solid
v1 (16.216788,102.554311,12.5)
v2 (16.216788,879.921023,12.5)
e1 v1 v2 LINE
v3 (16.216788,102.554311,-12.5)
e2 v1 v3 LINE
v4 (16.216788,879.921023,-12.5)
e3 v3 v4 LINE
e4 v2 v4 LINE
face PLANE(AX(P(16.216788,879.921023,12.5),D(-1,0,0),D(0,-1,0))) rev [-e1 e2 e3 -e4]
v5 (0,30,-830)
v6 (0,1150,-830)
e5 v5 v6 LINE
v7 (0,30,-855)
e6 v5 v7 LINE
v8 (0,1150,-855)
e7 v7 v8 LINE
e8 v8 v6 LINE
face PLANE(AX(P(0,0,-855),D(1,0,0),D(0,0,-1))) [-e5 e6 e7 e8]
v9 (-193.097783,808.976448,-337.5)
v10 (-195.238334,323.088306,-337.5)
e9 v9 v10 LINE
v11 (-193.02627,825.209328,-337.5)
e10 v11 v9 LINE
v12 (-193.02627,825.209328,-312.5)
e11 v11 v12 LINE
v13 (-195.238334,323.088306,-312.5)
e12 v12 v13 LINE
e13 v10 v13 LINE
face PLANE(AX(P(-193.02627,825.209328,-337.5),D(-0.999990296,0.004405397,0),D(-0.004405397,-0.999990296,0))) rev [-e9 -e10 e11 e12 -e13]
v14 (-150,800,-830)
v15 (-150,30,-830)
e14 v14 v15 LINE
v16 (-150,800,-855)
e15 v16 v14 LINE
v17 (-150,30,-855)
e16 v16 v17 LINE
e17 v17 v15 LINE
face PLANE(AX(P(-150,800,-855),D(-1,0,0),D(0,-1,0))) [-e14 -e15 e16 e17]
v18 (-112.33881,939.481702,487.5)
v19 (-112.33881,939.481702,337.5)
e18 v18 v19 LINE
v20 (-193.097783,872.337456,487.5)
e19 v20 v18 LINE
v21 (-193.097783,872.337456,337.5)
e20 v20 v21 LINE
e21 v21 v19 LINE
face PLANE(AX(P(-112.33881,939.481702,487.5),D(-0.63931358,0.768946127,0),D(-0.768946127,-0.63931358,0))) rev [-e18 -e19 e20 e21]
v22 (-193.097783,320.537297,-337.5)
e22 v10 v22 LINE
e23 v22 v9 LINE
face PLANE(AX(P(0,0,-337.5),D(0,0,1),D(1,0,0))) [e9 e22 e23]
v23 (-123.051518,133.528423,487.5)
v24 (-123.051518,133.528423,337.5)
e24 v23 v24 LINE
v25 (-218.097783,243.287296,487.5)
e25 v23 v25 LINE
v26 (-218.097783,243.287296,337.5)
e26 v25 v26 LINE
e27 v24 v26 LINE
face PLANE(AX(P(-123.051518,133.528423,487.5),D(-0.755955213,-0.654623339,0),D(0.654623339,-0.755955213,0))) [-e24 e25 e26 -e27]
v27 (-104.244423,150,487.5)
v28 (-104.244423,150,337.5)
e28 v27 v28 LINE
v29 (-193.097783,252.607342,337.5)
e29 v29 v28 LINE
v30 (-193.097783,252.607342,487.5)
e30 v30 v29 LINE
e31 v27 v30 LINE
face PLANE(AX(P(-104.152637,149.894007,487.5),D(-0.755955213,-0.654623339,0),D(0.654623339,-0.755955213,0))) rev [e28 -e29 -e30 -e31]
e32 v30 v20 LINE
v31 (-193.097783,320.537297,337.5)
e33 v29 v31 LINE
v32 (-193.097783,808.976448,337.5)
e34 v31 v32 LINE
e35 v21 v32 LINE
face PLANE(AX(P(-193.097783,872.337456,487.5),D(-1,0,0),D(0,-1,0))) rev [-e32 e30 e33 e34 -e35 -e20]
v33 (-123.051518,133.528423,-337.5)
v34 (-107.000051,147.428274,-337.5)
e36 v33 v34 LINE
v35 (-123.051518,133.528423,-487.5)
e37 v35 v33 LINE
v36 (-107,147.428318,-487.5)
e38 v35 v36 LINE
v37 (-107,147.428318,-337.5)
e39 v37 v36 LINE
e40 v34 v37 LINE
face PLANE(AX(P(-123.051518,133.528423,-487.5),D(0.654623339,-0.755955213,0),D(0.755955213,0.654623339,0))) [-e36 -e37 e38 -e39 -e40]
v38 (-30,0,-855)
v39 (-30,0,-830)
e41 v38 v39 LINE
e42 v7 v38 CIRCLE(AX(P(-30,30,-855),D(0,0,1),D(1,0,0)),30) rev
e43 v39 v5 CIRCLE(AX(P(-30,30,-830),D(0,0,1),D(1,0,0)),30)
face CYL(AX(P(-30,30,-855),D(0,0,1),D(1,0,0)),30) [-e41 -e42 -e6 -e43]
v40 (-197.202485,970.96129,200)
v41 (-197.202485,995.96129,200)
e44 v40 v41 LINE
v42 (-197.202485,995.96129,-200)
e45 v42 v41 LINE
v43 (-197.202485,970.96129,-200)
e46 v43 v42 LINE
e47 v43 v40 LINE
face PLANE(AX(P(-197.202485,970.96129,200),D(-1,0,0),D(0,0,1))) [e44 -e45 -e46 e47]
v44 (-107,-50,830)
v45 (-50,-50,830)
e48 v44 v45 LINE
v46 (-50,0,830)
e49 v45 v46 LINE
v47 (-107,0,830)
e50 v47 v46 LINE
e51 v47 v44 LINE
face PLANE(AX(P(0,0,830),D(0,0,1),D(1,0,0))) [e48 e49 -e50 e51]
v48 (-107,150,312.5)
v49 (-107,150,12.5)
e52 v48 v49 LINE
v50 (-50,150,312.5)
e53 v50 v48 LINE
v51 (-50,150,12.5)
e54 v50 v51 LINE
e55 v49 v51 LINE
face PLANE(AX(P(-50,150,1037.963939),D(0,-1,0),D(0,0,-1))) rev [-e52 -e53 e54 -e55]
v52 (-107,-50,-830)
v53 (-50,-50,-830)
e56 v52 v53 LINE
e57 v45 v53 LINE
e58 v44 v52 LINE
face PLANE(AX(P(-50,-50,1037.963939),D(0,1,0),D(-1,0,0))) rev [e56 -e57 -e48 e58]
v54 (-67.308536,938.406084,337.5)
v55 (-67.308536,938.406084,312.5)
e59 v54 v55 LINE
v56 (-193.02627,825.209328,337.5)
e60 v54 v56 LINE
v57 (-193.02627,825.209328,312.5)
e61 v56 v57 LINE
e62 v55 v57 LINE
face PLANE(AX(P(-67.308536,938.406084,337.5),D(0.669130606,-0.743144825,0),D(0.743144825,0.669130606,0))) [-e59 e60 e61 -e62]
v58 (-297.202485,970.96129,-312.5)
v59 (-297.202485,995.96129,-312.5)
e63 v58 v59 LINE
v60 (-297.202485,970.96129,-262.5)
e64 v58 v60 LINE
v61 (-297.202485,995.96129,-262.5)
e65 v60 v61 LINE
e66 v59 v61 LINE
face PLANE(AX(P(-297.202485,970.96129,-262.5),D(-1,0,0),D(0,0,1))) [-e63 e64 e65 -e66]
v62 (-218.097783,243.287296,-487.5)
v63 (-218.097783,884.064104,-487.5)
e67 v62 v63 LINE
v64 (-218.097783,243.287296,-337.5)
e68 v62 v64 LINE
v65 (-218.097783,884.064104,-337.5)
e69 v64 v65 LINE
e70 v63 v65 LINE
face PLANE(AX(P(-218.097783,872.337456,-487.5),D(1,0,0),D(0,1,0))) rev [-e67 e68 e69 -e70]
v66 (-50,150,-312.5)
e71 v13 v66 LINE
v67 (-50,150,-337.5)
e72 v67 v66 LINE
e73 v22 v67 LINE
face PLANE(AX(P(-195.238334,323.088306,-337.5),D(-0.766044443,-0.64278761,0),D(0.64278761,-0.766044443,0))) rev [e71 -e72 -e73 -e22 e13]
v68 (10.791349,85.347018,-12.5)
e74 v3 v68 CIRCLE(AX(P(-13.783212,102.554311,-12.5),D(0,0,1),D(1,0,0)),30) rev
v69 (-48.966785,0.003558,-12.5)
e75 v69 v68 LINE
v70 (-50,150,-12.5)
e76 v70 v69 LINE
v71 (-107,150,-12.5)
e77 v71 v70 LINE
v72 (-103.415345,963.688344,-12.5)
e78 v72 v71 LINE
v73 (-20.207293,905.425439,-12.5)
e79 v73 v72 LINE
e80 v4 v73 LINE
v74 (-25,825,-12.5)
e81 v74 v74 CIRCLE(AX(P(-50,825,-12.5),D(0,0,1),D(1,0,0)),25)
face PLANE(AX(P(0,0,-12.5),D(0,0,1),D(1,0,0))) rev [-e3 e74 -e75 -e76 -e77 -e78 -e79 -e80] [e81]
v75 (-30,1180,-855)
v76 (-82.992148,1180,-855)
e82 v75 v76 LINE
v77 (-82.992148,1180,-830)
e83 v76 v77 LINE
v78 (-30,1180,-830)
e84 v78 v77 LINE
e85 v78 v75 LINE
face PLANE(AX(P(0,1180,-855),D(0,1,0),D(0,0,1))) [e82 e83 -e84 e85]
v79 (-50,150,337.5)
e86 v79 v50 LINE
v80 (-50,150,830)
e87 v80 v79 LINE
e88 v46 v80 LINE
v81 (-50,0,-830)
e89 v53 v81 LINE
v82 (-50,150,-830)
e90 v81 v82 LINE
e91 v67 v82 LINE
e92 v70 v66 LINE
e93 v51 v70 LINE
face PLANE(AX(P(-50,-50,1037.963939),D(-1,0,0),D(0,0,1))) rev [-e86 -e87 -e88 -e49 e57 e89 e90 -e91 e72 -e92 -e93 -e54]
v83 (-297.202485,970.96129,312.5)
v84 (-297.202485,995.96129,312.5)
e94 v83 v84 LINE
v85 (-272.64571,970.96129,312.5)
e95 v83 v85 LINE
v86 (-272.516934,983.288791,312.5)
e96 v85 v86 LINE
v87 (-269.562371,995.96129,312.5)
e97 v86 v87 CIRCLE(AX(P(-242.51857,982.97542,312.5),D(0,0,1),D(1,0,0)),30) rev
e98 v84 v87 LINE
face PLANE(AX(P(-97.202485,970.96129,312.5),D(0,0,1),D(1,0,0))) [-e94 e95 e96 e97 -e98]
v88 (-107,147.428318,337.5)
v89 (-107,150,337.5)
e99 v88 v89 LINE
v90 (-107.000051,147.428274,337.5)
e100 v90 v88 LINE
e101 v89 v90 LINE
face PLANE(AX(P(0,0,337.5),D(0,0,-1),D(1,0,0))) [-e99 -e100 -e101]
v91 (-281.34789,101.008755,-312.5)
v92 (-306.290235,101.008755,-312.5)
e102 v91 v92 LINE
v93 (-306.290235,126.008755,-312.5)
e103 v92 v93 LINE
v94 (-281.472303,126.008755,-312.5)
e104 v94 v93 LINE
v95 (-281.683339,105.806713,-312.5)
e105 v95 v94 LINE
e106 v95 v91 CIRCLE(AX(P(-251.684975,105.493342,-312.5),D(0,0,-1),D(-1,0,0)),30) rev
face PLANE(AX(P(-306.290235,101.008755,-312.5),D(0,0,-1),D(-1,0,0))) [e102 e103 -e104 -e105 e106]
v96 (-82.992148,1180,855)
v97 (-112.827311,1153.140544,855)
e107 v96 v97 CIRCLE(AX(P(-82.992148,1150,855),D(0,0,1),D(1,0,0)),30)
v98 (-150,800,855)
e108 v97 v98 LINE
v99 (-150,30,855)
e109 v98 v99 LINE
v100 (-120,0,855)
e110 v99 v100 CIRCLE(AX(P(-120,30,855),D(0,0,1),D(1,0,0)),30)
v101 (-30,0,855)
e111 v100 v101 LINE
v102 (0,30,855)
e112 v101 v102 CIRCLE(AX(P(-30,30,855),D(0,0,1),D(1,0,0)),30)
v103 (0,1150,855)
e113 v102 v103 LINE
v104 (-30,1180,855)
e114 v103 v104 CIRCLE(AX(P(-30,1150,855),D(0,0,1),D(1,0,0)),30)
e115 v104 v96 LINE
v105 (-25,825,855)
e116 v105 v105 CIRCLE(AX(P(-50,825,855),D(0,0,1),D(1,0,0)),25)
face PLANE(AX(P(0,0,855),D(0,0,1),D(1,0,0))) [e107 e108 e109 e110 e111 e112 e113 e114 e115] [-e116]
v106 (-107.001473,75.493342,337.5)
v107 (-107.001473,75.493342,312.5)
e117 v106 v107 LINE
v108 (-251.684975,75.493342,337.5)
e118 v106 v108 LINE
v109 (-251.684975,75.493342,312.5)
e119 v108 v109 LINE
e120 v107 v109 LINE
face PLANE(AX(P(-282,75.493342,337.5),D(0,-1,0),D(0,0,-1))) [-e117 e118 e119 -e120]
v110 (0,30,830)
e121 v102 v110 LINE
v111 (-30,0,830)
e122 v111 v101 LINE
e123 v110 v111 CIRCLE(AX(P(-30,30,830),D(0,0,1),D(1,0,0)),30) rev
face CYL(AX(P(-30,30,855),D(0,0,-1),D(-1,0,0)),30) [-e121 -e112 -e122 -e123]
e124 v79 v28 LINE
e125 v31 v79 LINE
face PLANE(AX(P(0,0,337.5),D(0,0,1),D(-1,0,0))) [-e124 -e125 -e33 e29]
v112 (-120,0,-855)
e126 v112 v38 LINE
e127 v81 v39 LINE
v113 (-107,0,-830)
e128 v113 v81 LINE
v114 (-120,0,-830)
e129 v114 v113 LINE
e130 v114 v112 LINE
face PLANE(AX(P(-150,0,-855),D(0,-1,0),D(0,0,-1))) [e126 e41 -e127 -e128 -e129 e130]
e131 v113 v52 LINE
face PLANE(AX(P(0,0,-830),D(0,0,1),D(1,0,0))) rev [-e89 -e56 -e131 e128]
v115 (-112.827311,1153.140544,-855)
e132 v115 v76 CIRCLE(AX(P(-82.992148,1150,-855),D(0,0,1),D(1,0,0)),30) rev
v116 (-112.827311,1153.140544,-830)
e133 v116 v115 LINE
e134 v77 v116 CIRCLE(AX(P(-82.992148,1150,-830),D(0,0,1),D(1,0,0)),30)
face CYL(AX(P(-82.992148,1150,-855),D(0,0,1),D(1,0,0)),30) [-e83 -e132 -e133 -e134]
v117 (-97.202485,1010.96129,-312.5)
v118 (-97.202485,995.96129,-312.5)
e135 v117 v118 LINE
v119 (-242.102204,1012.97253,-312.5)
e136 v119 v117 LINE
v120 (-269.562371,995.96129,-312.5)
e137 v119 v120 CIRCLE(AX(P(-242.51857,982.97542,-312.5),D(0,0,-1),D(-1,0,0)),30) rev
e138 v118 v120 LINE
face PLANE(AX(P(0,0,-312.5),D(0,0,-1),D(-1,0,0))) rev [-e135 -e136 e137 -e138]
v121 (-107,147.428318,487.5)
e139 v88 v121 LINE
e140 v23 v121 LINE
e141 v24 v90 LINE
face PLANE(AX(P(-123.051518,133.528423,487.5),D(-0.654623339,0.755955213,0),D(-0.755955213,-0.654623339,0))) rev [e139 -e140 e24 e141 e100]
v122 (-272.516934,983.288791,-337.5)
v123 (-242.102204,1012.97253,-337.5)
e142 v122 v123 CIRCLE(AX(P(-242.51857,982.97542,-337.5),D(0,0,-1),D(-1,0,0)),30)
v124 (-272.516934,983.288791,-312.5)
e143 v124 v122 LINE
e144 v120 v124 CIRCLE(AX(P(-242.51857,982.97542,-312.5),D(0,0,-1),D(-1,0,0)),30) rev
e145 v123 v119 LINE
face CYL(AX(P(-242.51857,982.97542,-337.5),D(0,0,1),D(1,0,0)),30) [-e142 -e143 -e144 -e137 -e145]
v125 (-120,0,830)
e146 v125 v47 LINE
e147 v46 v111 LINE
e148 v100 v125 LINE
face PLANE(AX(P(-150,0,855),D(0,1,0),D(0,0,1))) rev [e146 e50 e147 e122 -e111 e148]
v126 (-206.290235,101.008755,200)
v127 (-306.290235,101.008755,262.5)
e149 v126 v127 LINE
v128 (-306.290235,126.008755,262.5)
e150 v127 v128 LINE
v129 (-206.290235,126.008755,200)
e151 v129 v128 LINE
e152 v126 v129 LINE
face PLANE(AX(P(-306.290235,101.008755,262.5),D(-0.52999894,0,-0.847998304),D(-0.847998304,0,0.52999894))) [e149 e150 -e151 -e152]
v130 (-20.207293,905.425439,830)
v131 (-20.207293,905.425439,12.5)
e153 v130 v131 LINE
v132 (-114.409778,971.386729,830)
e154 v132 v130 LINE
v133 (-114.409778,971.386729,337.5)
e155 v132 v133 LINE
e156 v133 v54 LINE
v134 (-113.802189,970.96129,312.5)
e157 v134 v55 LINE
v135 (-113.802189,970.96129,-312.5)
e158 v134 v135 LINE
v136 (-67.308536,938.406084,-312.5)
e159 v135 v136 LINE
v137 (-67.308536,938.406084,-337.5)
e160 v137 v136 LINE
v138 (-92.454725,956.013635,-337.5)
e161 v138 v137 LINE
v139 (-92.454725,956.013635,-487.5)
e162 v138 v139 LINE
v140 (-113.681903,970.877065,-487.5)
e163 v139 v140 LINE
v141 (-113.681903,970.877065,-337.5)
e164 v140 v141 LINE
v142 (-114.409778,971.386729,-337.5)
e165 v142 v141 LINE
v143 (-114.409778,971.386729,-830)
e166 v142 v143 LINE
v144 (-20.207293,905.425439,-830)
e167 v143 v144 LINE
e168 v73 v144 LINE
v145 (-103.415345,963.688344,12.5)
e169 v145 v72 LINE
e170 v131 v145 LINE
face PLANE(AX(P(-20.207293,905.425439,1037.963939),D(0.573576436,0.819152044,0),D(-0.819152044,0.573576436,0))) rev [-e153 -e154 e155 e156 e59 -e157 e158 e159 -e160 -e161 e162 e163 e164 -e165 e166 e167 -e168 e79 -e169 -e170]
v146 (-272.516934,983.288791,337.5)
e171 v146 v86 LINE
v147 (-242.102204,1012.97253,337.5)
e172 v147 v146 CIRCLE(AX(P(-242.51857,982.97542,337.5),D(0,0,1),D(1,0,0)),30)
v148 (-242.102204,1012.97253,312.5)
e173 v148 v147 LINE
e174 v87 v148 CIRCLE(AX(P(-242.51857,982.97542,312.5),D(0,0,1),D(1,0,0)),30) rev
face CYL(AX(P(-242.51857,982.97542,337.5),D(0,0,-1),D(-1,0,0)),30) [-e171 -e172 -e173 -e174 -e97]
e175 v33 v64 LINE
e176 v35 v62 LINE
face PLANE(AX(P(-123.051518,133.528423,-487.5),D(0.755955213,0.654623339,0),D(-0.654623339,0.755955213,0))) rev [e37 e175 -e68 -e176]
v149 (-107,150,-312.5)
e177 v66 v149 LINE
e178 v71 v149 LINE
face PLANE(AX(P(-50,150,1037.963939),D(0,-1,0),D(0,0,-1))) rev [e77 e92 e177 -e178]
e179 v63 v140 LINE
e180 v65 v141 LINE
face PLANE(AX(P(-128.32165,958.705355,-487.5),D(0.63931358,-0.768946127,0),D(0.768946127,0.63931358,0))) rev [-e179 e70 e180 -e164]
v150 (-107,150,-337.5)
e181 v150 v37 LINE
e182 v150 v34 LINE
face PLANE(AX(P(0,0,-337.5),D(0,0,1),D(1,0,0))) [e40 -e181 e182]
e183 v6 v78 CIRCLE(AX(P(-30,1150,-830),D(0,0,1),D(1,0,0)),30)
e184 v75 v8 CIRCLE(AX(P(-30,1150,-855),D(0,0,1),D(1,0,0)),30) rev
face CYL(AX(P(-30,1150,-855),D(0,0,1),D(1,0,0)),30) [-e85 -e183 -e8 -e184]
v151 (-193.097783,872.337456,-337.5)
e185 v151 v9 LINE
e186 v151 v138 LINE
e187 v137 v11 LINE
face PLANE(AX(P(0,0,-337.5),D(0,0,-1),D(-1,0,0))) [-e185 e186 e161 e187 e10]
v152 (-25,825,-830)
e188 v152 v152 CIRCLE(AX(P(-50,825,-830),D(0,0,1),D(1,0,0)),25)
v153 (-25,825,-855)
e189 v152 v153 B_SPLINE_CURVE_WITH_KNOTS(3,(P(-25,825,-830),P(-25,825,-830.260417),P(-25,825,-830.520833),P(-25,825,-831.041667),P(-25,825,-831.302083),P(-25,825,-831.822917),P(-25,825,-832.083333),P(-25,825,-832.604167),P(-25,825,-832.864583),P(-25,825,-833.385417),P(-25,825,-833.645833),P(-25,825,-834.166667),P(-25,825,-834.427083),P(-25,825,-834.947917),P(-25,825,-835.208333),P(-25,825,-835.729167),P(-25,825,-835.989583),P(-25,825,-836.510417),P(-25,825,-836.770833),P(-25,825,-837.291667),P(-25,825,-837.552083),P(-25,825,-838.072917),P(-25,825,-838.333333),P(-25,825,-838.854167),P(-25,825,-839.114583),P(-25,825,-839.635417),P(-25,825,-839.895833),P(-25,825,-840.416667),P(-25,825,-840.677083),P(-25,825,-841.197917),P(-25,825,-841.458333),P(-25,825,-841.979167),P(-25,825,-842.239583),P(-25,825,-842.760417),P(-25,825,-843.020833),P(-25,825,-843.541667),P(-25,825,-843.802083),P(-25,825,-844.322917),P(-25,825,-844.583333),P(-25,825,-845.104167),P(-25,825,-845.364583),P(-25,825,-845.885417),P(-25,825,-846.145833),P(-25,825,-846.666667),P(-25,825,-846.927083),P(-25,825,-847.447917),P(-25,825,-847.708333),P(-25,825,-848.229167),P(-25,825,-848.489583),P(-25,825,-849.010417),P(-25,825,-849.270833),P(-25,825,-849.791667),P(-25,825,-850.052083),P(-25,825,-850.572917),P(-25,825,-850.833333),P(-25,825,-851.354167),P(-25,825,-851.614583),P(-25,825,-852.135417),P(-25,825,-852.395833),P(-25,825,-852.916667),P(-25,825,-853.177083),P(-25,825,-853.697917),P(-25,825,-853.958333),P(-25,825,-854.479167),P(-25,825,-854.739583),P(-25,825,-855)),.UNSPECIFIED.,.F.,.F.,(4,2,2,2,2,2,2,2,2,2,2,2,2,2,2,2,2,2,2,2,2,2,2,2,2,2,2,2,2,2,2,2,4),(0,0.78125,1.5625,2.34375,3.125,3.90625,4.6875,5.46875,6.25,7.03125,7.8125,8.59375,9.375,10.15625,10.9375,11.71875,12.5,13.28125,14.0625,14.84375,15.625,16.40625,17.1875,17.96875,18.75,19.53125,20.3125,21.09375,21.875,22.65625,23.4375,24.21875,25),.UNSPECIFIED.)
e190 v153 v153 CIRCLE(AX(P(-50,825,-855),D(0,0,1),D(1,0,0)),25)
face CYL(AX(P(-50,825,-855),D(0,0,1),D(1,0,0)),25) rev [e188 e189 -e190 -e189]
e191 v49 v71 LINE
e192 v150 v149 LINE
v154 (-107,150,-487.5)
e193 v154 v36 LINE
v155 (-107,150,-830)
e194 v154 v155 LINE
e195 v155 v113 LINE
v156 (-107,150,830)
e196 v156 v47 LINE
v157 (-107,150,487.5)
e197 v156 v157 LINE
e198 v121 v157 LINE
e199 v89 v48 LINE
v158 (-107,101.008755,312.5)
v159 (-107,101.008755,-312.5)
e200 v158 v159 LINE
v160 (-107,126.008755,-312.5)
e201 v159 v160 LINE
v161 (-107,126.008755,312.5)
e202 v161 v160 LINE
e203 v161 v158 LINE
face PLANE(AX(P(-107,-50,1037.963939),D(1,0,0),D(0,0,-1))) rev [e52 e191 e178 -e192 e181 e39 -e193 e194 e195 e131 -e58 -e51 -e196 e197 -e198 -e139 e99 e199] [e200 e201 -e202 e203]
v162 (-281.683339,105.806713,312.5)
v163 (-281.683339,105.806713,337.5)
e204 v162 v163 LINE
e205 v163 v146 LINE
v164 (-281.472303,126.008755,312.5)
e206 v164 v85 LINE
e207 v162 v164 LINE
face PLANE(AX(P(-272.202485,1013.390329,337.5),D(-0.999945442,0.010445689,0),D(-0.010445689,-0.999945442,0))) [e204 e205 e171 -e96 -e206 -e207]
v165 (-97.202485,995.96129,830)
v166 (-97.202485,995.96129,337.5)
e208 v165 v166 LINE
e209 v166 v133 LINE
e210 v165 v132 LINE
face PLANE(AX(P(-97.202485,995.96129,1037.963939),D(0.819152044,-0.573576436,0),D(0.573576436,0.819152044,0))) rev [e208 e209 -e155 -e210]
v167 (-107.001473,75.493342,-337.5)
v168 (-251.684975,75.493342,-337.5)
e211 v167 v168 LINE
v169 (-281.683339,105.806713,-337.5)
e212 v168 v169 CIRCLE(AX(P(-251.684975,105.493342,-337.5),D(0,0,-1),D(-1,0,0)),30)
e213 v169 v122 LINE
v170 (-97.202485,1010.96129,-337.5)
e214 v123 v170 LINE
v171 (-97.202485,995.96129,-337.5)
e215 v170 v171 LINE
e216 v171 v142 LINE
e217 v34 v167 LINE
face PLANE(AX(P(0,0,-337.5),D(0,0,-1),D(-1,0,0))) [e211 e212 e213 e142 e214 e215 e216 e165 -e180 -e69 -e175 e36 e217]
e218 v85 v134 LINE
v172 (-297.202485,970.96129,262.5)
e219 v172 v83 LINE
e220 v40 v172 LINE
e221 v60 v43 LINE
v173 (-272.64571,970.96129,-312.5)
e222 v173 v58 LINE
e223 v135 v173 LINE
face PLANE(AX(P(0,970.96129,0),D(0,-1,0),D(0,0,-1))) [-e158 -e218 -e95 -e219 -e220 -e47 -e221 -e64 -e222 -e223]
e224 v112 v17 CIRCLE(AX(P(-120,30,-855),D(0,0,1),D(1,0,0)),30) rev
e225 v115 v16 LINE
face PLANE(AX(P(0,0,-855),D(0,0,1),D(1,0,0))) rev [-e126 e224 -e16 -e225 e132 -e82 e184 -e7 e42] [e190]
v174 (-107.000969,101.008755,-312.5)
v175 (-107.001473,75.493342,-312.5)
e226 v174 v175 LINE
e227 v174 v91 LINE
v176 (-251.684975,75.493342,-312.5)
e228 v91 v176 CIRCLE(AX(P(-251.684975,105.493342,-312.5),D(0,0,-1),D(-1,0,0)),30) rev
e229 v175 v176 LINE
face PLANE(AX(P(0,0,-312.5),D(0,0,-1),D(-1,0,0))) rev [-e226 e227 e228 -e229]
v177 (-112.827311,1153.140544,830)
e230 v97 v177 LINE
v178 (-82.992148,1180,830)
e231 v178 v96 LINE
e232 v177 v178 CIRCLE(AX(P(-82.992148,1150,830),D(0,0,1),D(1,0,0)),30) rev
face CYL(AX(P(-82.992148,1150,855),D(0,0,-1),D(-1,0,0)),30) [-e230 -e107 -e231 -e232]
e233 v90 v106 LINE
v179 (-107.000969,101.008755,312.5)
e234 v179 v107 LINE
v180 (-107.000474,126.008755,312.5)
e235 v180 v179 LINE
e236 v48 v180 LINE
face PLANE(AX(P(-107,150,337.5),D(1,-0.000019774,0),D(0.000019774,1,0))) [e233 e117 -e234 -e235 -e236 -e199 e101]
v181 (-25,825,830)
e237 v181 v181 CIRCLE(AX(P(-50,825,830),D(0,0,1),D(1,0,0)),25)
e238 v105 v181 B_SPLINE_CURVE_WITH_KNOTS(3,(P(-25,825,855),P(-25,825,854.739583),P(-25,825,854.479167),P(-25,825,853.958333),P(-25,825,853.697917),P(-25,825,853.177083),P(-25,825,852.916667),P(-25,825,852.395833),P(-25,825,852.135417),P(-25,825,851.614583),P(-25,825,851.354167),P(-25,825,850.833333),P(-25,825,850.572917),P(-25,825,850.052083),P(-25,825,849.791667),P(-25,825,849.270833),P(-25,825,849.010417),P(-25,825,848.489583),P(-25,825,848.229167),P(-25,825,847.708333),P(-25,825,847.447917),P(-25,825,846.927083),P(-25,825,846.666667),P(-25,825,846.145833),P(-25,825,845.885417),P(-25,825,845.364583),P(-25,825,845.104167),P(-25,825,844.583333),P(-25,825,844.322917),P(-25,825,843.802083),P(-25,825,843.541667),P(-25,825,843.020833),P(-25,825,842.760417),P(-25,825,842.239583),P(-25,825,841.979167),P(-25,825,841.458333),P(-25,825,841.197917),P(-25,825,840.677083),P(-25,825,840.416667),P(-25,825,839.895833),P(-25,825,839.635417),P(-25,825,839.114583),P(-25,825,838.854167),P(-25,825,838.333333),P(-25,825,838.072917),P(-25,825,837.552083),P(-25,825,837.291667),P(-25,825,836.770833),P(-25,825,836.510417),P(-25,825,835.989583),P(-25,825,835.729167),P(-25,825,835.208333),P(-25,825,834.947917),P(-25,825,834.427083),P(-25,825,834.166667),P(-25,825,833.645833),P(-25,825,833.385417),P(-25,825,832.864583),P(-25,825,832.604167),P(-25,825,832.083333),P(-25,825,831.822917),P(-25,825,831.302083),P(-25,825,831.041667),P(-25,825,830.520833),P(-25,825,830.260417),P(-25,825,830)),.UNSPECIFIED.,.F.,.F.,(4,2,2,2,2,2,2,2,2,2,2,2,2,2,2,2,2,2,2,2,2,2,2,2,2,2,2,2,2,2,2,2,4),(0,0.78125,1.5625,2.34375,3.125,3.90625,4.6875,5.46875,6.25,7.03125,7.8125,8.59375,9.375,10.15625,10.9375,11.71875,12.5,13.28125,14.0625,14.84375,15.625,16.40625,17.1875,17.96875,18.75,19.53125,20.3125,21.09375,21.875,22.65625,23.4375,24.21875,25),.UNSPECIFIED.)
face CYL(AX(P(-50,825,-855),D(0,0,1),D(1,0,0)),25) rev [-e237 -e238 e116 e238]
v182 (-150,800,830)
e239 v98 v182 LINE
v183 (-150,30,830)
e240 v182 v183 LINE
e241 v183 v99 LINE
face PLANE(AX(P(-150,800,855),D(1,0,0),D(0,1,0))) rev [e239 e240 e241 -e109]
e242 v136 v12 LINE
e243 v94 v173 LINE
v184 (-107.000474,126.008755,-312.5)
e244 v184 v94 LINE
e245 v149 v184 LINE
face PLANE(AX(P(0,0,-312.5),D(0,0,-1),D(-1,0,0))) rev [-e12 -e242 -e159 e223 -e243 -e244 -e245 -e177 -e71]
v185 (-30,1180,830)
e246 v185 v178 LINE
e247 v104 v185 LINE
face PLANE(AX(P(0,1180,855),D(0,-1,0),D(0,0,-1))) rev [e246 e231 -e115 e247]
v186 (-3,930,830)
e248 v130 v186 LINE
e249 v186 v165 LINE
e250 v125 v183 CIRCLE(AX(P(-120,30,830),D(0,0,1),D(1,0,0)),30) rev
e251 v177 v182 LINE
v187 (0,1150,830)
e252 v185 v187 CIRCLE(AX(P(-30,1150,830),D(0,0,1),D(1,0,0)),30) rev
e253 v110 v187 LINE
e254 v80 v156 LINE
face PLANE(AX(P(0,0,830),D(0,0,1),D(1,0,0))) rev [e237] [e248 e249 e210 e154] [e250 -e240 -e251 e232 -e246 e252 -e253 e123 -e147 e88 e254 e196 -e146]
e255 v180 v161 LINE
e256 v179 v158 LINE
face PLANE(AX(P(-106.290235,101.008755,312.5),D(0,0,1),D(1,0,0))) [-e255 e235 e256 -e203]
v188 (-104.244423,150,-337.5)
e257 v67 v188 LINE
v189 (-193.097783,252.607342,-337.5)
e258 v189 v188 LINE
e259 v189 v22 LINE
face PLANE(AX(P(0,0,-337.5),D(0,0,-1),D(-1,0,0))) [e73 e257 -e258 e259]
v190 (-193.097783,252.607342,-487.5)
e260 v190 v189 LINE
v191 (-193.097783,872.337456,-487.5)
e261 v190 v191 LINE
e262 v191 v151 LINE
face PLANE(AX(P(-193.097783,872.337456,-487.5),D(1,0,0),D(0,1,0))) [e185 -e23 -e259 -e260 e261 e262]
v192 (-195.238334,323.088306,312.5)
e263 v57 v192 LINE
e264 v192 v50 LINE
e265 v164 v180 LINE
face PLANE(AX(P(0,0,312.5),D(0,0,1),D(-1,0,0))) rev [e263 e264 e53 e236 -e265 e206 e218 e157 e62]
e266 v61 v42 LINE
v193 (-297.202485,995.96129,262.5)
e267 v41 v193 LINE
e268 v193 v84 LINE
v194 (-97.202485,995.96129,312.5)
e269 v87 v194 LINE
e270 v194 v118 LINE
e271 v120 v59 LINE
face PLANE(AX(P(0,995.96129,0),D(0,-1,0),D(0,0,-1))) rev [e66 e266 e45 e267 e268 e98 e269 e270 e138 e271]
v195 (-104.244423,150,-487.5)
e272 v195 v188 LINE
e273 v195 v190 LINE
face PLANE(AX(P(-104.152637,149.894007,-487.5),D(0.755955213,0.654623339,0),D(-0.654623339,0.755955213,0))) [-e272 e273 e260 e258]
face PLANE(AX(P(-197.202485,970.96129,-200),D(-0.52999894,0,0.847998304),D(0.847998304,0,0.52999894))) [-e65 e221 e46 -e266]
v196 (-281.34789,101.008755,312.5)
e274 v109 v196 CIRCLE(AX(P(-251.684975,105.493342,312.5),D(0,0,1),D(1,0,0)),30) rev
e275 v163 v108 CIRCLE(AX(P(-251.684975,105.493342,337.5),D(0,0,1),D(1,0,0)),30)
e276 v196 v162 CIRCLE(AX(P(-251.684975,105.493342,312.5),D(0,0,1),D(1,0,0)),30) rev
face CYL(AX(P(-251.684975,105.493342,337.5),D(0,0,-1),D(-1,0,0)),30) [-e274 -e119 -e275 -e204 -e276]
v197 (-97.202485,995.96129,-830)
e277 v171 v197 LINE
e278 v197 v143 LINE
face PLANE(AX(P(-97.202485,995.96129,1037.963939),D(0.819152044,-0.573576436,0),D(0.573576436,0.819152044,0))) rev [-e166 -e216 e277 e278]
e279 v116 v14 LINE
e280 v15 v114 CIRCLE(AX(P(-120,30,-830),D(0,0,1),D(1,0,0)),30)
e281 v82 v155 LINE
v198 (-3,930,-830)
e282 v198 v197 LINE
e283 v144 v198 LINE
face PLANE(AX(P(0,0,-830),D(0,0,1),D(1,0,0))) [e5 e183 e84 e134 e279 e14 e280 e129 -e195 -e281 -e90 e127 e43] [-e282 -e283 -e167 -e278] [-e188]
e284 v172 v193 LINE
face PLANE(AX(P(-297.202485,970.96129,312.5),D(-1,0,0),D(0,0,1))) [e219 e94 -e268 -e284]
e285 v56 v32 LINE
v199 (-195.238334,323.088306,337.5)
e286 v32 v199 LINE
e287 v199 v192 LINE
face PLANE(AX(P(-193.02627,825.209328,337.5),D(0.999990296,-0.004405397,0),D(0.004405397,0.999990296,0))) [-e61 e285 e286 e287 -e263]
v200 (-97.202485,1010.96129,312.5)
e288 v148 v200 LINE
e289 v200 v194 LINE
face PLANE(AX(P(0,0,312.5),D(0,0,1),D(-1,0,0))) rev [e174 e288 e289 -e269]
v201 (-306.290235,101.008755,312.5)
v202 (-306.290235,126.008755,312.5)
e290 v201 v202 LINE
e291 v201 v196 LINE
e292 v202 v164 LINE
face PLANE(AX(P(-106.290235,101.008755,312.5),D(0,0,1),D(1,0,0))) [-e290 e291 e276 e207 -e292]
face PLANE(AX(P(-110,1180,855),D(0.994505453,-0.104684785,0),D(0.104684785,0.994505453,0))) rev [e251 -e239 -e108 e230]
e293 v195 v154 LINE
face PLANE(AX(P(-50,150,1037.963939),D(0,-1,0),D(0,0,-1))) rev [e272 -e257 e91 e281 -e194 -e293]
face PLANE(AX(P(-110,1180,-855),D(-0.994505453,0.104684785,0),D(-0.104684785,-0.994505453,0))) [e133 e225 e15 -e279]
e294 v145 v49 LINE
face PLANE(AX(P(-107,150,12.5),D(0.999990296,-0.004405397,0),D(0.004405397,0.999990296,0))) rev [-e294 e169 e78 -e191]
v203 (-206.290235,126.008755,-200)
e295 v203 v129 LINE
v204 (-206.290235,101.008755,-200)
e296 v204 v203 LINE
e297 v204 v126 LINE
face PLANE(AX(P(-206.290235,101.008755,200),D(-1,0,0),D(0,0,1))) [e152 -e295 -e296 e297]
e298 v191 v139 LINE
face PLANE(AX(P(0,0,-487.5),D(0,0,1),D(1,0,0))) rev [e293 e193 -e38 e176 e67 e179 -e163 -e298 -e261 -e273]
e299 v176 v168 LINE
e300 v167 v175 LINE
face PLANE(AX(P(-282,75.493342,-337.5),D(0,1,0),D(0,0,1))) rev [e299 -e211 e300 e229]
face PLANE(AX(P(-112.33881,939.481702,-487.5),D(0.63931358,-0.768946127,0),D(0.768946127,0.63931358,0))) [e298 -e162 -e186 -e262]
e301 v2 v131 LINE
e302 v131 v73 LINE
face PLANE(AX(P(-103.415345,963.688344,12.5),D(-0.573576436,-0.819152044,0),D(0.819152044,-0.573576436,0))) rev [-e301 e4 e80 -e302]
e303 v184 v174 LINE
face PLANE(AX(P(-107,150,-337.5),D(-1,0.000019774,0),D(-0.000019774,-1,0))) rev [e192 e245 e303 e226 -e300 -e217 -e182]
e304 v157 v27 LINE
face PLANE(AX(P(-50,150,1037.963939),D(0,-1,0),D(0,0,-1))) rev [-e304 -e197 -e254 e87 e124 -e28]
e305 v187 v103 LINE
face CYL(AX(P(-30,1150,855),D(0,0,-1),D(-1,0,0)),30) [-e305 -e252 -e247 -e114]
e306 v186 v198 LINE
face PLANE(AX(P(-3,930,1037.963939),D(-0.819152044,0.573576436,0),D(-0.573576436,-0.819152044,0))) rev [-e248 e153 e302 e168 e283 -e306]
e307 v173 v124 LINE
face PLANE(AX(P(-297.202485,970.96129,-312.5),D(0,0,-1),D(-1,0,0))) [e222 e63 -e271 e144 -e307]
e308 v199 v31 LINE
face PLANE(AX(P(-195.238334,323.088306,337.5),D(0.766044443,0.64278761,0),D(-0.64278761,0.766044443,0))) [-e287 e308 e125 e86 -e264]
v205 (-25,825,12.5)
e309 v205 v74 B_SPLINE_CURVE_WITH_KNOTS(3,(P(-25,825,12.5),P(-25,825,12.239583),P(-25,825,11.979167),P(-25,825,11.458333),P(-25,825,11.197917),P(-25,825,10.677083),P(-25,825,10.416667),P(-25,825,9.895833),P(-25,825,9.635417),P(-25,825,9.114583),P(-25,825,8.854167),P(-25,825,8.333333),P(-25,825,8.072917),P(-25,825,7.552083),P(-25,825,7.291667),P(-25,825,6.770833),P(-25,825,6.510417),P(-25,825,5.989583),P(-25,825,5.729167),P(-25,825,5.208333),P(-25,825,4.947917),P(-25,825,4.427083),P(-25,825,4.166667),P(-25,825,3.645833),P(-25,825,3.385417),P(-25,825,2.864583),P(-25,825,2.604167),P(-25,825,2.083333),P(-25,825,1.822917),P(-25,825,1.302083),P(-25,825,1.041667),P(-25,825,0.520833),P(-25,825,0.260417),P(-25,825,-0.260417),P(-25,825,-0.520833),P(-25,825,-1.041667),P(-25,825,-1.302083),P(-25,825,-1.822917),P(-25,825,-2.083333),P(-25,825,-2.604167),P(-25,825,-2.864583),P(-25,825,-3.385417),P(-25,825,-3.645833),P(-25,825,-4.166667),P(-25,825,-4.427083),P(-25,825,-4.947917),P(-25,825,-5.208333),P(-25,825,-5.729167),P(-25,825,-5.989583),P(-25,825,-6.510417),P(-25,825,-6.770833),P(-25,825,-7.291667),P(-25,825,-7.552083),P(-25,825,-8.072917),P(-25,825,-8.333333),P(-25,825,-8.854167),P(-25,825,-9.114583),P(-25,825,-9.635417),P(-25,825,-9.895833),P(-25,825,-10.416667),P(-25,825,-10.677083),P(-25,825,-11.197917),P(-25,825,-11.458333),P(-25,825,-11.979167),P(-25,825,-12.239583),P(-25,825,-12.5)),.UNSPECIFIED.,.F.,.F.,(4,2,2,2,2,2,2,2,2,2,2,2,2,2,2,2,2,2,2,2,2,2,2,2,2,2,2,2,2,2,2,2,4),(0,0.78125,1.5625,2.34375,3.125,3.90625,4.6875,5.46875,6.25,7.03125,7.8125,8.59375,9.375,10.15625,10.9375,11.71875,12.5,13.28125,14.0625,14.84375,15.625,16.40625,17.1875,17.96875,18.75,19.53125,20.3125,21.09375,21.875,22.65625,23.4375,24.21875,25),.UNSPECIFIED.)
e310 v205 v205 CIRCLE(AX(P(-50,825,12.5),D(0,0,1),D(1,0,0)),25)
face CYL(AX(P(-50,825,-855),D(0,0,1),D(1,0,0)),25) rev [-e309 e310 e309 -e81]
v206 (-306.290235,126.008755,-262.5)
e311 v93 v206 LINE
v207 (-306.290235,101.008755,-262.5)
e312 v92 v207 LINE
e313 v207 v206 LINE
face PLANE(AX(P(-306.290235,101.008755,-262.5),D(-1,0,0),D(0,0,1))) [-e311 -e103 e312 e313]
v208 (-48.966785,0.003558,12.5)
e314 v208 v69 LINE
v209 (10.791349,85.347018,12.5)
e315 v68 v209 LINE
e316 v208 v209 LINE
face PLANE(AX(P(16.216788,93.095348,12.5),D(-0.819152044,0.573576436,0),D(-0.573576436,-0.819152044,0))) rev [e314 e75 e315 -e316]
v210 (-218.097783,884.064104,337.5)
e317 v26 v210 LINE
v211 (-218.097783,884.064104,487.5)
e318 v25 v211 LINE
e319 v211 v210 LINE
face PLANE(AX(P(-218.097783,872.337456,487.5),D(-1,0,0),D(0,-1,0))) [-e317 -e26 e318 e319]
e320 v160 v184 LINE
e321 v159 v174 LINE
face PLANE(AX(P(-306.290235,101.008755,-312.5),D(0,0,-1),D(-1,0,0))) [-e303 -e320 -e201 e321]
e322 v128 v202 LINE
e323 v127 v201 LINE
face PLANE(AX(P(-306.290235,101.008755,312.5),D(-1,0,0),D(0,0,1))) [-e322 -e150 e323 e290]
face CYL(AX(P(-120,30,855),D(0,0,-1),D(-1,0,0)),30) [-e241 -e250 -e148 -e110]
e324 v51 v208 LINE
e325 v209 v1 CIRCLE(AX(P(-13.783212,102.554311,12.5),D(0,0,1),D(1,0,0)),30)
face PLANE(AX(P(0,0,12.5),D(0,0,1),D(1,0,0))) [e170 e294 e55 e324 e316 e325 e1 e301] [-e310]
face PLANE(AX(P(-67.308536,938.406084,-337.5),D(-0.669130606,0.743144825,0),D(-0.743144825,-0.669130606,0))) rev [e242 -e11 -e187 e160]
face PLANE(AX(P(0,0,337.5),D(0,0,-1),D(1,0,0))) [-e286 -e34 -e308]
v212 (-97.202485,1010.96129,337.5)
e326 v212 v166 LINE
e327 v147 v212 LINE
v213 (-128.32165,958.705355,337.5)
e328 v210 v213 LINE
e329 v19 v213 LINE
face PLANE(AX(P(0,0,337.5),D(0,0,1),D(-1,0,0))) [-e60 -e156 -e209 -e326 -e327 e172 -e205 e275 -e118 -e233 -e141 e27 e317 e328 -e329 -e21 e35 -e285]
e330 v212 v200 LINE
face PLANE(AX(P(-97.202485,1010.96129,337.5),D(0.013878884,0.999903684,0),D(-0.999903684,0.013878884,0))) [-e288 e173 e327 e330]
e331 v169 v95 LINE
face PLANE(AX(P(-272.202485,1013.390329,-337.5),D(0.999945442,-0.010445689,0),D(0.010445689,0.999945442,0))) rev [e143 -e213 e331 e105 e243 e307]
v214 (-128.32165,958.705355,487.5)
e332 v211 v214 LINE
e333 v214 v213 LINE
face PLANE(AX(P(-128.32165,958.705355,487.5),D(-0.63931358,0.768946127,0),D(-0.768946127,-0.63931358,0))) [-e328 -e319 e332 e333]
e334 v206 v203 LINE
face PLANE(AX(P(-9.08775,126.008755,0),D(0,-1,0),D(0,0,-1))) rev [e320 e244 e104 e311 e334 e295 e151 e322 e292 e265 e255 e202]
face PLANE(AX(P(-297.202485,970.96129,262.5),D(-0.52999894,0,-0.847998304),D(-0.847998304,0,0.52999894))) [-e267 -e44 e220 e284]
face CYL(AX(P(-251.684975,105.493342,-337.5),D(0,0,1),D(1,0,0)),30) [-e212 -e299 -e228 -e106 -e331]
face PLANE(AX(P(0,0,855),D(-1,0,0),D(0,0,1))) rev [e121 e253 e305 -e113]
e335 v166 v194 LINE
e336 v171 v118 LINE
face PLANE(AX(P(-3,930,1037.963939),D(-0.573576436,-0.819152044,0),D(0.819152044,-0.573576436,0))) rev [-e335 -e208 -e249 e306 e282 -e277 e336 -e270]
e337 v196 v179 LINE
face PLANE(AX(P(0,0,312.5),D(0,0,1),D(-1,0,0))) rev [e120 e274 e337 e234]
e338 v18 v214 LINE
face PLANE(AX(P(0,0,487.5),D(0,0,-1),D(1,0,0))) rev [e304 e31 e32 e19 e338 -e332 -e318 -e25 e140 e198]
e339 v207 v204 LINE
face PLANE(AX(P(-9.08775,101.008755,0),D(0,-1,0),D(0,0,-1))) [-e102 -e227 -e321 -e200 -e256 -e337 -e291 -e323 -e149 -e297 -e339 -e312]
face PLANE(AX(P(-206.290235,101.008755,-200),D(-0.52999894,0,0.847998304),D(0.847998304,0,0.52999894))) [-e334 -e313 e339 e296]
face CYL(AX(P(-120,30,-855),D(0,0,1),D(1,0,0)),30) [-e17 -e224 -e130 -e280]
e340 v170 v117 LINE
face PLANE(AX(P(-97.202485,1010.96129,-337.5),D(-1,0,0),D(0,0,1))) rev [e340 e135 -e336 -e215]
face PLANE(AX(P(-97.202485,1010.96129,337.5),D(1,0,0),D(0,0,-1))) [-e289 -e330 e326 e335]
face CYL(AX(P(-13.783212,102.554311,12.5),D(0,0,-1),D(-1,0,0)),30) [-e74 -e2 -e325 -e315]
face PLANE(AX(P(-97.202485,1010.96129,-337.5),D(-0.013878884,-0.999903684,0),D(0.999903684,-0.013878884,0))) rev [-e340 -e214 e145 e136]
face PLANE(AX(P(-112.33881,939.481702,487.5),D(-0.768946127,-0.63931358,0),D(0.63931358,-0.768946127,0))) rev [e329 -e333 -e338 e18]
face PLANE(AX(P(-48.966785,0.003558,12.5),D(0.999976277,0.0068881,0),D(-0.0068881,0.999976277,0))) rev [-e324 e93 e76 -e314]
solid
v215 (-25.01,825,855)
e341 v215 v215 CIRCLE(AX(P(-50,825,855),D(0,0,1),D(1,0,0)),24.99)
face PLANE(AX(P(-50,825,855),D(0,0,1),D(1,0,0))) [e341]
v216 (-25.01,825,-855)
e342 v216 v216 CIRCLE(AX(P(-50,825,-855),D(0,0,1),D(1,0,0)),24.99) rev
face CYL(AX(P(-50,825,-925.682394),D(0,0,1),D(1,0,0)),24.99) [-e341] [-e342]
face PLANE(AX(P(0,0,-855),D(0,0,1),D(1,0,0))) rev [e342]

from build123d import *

# Parameters (mm, degrees)
BOSS_EXTRUDE2_START  = 830
BOSS_EXTRUDE2_DEPTH  = 25
BOSS_EXTRUDE3_START  = -830
BOSS_EXTRUDE3_DEPTH  = 25
SKETCH2_W            = 57
SKETCH2_H            = 200
BOSS_EXTRUDE4_DEPTH  = 1660
BOSS_EXTRUDE5_DEPTH  = 12.5
SKETCH4_R            = 25
CUT_EXTRUDE1_DEPTH   = 2084.026644093
SKETCH5_R            = 24.99
BOSS_EXTRUDE6_DEPTH  = 1710
BOSS_EXTRUDE9_START  = 300
BOSS_EXTRUDE9_DEPTH  = 25
EXTRUDE_THIN11_DEPTH = 150
BOSS_EXTRUDE10_REACH = 1385.667
SKETCH12_W           = 150
SKETCH12_H           = 25
BOSS_EXTRUDE11_DEPTH = 25
LPATTERN1_COUNT      = 2
LPATTERN1_PITCH      = 870
FILLET1_R            = 30


with BuildPart() as part:
    # Sketch1 → Boss-Extrude2 (new body)
    with BuildSketch(Plane.XY.offset(BOSS_EXTRUDE2_START)):
        Polygon((0, 0), (0, 1180), (-110, 1180), (-150, 800), (-150, 0), align=None)
    extrude(amount=BOSS_EXTRUDE2_DEPTH)



with BuildPart() as body_2:
    # Sketch1<2> → Boss-Extrude3 (new body)
    with BuildSketch(Plane.XY.offset(BOSS_EXTRUDE3_START)):
        Polygon((0, 0), (0, 1180), (-110, 1180), (-150, 800), (-150, 0), align=None)
    extrude(amount=-BOSS_EXTRUDE3_DEPTH)


with BuildPart() as part_1:
    add(part.part)

    add(body_2.part)  # Boss-Extrude4 merges body 2
    # Sketch2 → Boss-Extrude4 (add)
    with BuildSketch(Plane.XY.offset(-830)):
        Polygon((-3, 930), (-20.207293091, 905.425438671), (-114.409778184, 971.386728852), (-97.202485093, 995.96129018), align=None)
        with Locations((-78.5, 50)):
            Rectangle(SKETCH2_W, SKETCH2_H)
    extrude(amount=BOSS_EXTRUDE4_DEPTH)

    # Sketch3 → Boss-Extrude5 (add, symmetric)
    with BuildSketch(Plane.XY):
        Polygon((-103.415345034, 963.688343882), (16.216787549, 879.921022835), (16.216787549, 93.095347735), (-48.966785029, 0.003558486), (-50, 150), (-107, 150), align=None)
    extrude(amount=BOSS_EXTRUDE5_DEPTH, both=True)

    # Sketch4 → Cut-Extrude1 (cut, through all)
    with BuildSketch(Plane.XY.offset(855)):
        with Locations((-50, 825)):
            Circle(SKETCH4_R)
    extrude(amount=-CUT_EXTRUDE1_DEPTH, mode=Mode.SUBTRACT)

    # Sketch6 → Boss-Extrude9 (add)
    with BuildSketch(Plane(origin=(0, 0, -12.5), x_dir=(-1, 0, 0), z_dir=(0, 0, -1)).offset(BOSS_EXTRUDE9_START)):
        Polygon((50, 150), (107, 150), (107.001473273, 75.493341843), (282, 75.493341843), (272.202485093, 1013.390328918), (97.202485093, 1010.96129018), (97.202485093, 995.96129018), (114.409778184, 971.386728852), (67.308535637, 938.406083762), (193.026269643, 825.209327623), (195.238333547, 323.088305787), align=None)
    boss_extrude9 = extrude(amount=BOSS_EXTRUDE9_DEPTH)

    # Sketch11 → Extrude-Thin11 (add)
    with BuildSketch(Plane(origin=(0, 0, -337.5), x_dir=(-1, 0, 0), z_dir=(0, 0, -1))):
        Polygon((112.33881046, 939.48170169), (193.097782618, 872.337456037), (193.097782618, 252.607341749), (104.152637174, 149.894006612), (123.051517504, 133.528423142), (218.097782618, 243.287295687), (218.097782618, 884.064103947), (128.321649968, 958.705354861), align=None)
    extrude_thin11 = extrude(amount=EXTRUDE_THIN11_DEPTH)

    # Sketch12 → Boss-Extrude10 (add, up to next)
    with BuildSketch(Plane(origin=(395.423561528, 328.761201919, 0), x_dir=(0, 0, -1), z_dir=(0.7689461268447529, 0.6393135803425837, 0)), mode=Mode.PRIVATE) as boss_extrude10_sk1:
        with Locations((412.5, 806.730542883)):
            Rectangle(SKETCH12_W, SKETCH12_H)
    boss_extrude10_tool1 = extrude(boss_extrude10_sk1.sketch, amount=BOSS_EXTRUDE10_REACH, mode=Mode.PRIVATE) - part_1.part
    add(boss_extrude10_tool1.solids().sort_by_distance((-120.33023, 949.093528, -412.5))[0])

    # Mirror1: Boss-Extrude9, Extrude-Thin11 across plane
    add(boss_extrude9.mirror(Plane.XY))
    add(extrude_thin11.mirror(Plane.XY))

    # Sketch13 → Boss-Extrude11 (add)
    with BuildSketch(Plane(origin=(0, 995.96129018, 0), x_dir=(1, 0, 0), z_dir=(0, 1, 0))):
        Polygon((-297.202485093, 312.5), (-97.202485093, 312.5), (-97.202485093, -312.5), (-297.202485093, -312.5), (-297.202485093, -262.5), (-197.202485093, -200), (-197.202485093, 200), (-297.202485093, 262.5), align=None)
    boss_extrude11 = extrude(amount=-BOSS_EXTRUDE11_DEPTH)

    # LPattern1: Boss-Extrude11 ×2
    with Locations(*[Vector(-0.01044568914487086, -0.9999454423008731, 0) * (i * LPATTERN1_PITCH) for i in range(1, LPATTERN1_COUNT)]):
        add(boss_extrude11)

    # Fillet1
    # the kernel refuses this fillet: 30 mm, written as the material it takes off along each edge
    with BuildSketch(Plane(origin=(-282, 75.493341843, -312.5), x_dir=(1, 0, 0), z_dir=(0, 0, -1))) as fillet1_piece_1:
        with BuildLine():
            CenterArc((FILLET1_R * 1.01050081974, -FILLET1_R), FILLET1_R, 90, 90.598504786)
            Line((FILLET1_R * 0.0105553774437, -FILLET1_R * 1.01044568914), (0, 0))
            Line((0, 0), (FILLET1_R * 1.01050081974, 0))
        make_face()
    extrude(amount=100.787561481, mode=Mode.SUBTRACT)
    with BuildSketch(Plane(origin=(-272.202485093, 1013.390328918, -312.5), x_dir=(0.9999036836445534, -0.01387888446716093, 0), z_dir=(0, 0, -1))) as fillet1_piece_2:
        with BuildLine():
            CenterArc((FILLET1_R * 1.00343935877, FILLET1_R), FILLET1_R, 179.803277751, 90.196722249)
            Line((FILLET1_R * 0.00344525305947, FILLET1_R * 1.00343344421), (0, 0))
            Line((0, 0), (FILLET1_R * 1.00343935877, 0))
        make_face()
    extrude(amount=100.257951908, mode=Mode.SUBTRACT)
    with BuildSketch(Plane(origin=(-272.202485093, 1013.390328918, 312.5), x_dir=(0.9999036836445534, -0.01387888446716093, 0), z_dir=(0, 0, 1))) as fillet1_piece_3:
        with BuildLine():
            CenterArc((FILLET1_R * 1.00343935877, -FILLET1_R), FILLET1_R, 90, 90.196722249)
            Line((FILLET1_R * 0.00344525305947, -FILLET1_R * 1.00343344421), (0, 0))
            Line((0, 0), (FILLET1_R * 1.00343935877, 0))
        make_face()
    extrude(amount=100.257951908, mode=Mode.SUBTRACT)
    with BuildSketch(Plane(origin=(-282, 75.493341843, 312.5), x_dir=(1, 0, 0), z_dir=(0, 0, 1))) as fillet1_piece_4:
        with BuildLine():
            CenterArc((FILLET1_R * 1.01050081974, FILLET1_R), FILLET1_R, 179.401495214, 90.598504786)
            Line((FILLET1_R * 0.0105553774437, FILLET1_R * 1.01044568914), (0, 0))
            Line((0, 0), (FILLET1_R * 1.01050081974, 0))
        make_face()
    extrude(amount=100.787561481, mode=Mode.SUBTRACT)
    with BuildSketch(Plane(origin=(0, 0, -755), x_dir=(-1, 0, 0), z_dir=(0, 0, -1)), Plane(origin=(0, 1180, -755), x_dir=(0, -1, 0), z_dir=(0, 0, -1)), Plane(origin=(-150, 0, 755), x_dir=(1, 0, 0), z_dir=(0, 0, 1)), Plane(origin=(0, 0, 755), x_dir=(0, 1, 0), z_dir=(0, 0, 1))) as fillet1_piece_5:
        with BuildLine():
            CenterArc((FILLET1_R, FILLET1_R), FILLET1_R, 180, 90)
            Line((0, FILLET1_R), (0, 0))
            Line((0, 0), (FILLET1_R, 0))
        make_face()
    extrude(amount=175, mode=Mode.SUBTRACT)
    with BuildSketch(Plane(origin=(-150, 0, -755), x_dir=(1, 0, 0), z_dir=(0, 0, -1)), Plane(origin=(0, 1180, 755), x_dir=(0, -1, 0), z_dir=(0, 0, 1))) as fillet1_piece_6:
        with BuildLine():
            CenterArc((FILLET1_R, -FILLET1_R), FILLET1_R, 90, 90)
            Line((0, -FILLET1_R), (0, 0))
            Line((0, 0), (FILLET1_R, 0))
        make_face()
    extrude(amount=175, mode=Mode.SUBTRACT)
    with BuildSketch(Plane(origin=(-110, 1180, -762.480369048), x_dir=(1, 0, 0), z_dir=(0, 0, -1))) as fillet1_piece_7:
        with BuildLine():
            CenterArc((FILLET1_R * 0.900261746029, FILLET1_R), FILLET1_R, 186.009005957, 83.990994043)
            Line((-FILLET1_R * 0.0942437068928, FILLET1_R * 0.895315215482), (0, 0))
            Line((0, 0), (FILLET1_R * 0.900261746029, 0))
        make_face()
    extrude(amount=160.039261904, mode=Mode.SUBTRACT)
    with BuildSketch(Plane(origin=(16.216787549, 93.095347735, 36.147409166), x_dir=(-0.5735764363510503, -0.8191520442889889, 0), z_dir=(0, 0, -1))) as fillet1_piece_8:
        with BuildLine():
            CenterArc((FILLET1_R * 0.315298788879, FILLET1_R), FILLET1_R, 235, 35)
            Line((-FILLET1_R * 0.258277647472, FILLET1_R * 0.180847955711), (0, 0))
            Line((0, 0), (FILLET1_R * 0.315298788879, 0))
        make_face()
    extrude(amount=72.294818332, mode=Mode.SUBTRACT)
    with BuildSketch(Plane(origin=(-110, 1180, 762.480369048), x_dir=(1, 0, 0), z_dir=(0, 0, 1))) as fillet1_piece_9:
        with BuildLine():
            CenterArc((FILLET1_R * 0.900261746029, -FILLET1_R), FILLET1_R, 90, 83.990994043)
            Line((-FILLET1_R * 0.0942437068928, -FILLET1_R * 0.895315215482), (0, 0))
            Line((0, 0), (FILLET1_R * 0.900261746029, 0))
        make_face()
    extrude(amount=160.039261904, mode=Mode.SUBTRACT)


with BuildPart() as body_2_2:
    # Sketch5 → Boss-Extrude6 (new body)
    with BuildSketch(Plane.XY.offset(855)):
        with Locations((-50, 825)):
            Circle(SKETCH5_R)
    extrude(amount=-BOSS_EXTRUDE6_DEPTH)


solid = Compound([part_1.part, body_2_2.part])
